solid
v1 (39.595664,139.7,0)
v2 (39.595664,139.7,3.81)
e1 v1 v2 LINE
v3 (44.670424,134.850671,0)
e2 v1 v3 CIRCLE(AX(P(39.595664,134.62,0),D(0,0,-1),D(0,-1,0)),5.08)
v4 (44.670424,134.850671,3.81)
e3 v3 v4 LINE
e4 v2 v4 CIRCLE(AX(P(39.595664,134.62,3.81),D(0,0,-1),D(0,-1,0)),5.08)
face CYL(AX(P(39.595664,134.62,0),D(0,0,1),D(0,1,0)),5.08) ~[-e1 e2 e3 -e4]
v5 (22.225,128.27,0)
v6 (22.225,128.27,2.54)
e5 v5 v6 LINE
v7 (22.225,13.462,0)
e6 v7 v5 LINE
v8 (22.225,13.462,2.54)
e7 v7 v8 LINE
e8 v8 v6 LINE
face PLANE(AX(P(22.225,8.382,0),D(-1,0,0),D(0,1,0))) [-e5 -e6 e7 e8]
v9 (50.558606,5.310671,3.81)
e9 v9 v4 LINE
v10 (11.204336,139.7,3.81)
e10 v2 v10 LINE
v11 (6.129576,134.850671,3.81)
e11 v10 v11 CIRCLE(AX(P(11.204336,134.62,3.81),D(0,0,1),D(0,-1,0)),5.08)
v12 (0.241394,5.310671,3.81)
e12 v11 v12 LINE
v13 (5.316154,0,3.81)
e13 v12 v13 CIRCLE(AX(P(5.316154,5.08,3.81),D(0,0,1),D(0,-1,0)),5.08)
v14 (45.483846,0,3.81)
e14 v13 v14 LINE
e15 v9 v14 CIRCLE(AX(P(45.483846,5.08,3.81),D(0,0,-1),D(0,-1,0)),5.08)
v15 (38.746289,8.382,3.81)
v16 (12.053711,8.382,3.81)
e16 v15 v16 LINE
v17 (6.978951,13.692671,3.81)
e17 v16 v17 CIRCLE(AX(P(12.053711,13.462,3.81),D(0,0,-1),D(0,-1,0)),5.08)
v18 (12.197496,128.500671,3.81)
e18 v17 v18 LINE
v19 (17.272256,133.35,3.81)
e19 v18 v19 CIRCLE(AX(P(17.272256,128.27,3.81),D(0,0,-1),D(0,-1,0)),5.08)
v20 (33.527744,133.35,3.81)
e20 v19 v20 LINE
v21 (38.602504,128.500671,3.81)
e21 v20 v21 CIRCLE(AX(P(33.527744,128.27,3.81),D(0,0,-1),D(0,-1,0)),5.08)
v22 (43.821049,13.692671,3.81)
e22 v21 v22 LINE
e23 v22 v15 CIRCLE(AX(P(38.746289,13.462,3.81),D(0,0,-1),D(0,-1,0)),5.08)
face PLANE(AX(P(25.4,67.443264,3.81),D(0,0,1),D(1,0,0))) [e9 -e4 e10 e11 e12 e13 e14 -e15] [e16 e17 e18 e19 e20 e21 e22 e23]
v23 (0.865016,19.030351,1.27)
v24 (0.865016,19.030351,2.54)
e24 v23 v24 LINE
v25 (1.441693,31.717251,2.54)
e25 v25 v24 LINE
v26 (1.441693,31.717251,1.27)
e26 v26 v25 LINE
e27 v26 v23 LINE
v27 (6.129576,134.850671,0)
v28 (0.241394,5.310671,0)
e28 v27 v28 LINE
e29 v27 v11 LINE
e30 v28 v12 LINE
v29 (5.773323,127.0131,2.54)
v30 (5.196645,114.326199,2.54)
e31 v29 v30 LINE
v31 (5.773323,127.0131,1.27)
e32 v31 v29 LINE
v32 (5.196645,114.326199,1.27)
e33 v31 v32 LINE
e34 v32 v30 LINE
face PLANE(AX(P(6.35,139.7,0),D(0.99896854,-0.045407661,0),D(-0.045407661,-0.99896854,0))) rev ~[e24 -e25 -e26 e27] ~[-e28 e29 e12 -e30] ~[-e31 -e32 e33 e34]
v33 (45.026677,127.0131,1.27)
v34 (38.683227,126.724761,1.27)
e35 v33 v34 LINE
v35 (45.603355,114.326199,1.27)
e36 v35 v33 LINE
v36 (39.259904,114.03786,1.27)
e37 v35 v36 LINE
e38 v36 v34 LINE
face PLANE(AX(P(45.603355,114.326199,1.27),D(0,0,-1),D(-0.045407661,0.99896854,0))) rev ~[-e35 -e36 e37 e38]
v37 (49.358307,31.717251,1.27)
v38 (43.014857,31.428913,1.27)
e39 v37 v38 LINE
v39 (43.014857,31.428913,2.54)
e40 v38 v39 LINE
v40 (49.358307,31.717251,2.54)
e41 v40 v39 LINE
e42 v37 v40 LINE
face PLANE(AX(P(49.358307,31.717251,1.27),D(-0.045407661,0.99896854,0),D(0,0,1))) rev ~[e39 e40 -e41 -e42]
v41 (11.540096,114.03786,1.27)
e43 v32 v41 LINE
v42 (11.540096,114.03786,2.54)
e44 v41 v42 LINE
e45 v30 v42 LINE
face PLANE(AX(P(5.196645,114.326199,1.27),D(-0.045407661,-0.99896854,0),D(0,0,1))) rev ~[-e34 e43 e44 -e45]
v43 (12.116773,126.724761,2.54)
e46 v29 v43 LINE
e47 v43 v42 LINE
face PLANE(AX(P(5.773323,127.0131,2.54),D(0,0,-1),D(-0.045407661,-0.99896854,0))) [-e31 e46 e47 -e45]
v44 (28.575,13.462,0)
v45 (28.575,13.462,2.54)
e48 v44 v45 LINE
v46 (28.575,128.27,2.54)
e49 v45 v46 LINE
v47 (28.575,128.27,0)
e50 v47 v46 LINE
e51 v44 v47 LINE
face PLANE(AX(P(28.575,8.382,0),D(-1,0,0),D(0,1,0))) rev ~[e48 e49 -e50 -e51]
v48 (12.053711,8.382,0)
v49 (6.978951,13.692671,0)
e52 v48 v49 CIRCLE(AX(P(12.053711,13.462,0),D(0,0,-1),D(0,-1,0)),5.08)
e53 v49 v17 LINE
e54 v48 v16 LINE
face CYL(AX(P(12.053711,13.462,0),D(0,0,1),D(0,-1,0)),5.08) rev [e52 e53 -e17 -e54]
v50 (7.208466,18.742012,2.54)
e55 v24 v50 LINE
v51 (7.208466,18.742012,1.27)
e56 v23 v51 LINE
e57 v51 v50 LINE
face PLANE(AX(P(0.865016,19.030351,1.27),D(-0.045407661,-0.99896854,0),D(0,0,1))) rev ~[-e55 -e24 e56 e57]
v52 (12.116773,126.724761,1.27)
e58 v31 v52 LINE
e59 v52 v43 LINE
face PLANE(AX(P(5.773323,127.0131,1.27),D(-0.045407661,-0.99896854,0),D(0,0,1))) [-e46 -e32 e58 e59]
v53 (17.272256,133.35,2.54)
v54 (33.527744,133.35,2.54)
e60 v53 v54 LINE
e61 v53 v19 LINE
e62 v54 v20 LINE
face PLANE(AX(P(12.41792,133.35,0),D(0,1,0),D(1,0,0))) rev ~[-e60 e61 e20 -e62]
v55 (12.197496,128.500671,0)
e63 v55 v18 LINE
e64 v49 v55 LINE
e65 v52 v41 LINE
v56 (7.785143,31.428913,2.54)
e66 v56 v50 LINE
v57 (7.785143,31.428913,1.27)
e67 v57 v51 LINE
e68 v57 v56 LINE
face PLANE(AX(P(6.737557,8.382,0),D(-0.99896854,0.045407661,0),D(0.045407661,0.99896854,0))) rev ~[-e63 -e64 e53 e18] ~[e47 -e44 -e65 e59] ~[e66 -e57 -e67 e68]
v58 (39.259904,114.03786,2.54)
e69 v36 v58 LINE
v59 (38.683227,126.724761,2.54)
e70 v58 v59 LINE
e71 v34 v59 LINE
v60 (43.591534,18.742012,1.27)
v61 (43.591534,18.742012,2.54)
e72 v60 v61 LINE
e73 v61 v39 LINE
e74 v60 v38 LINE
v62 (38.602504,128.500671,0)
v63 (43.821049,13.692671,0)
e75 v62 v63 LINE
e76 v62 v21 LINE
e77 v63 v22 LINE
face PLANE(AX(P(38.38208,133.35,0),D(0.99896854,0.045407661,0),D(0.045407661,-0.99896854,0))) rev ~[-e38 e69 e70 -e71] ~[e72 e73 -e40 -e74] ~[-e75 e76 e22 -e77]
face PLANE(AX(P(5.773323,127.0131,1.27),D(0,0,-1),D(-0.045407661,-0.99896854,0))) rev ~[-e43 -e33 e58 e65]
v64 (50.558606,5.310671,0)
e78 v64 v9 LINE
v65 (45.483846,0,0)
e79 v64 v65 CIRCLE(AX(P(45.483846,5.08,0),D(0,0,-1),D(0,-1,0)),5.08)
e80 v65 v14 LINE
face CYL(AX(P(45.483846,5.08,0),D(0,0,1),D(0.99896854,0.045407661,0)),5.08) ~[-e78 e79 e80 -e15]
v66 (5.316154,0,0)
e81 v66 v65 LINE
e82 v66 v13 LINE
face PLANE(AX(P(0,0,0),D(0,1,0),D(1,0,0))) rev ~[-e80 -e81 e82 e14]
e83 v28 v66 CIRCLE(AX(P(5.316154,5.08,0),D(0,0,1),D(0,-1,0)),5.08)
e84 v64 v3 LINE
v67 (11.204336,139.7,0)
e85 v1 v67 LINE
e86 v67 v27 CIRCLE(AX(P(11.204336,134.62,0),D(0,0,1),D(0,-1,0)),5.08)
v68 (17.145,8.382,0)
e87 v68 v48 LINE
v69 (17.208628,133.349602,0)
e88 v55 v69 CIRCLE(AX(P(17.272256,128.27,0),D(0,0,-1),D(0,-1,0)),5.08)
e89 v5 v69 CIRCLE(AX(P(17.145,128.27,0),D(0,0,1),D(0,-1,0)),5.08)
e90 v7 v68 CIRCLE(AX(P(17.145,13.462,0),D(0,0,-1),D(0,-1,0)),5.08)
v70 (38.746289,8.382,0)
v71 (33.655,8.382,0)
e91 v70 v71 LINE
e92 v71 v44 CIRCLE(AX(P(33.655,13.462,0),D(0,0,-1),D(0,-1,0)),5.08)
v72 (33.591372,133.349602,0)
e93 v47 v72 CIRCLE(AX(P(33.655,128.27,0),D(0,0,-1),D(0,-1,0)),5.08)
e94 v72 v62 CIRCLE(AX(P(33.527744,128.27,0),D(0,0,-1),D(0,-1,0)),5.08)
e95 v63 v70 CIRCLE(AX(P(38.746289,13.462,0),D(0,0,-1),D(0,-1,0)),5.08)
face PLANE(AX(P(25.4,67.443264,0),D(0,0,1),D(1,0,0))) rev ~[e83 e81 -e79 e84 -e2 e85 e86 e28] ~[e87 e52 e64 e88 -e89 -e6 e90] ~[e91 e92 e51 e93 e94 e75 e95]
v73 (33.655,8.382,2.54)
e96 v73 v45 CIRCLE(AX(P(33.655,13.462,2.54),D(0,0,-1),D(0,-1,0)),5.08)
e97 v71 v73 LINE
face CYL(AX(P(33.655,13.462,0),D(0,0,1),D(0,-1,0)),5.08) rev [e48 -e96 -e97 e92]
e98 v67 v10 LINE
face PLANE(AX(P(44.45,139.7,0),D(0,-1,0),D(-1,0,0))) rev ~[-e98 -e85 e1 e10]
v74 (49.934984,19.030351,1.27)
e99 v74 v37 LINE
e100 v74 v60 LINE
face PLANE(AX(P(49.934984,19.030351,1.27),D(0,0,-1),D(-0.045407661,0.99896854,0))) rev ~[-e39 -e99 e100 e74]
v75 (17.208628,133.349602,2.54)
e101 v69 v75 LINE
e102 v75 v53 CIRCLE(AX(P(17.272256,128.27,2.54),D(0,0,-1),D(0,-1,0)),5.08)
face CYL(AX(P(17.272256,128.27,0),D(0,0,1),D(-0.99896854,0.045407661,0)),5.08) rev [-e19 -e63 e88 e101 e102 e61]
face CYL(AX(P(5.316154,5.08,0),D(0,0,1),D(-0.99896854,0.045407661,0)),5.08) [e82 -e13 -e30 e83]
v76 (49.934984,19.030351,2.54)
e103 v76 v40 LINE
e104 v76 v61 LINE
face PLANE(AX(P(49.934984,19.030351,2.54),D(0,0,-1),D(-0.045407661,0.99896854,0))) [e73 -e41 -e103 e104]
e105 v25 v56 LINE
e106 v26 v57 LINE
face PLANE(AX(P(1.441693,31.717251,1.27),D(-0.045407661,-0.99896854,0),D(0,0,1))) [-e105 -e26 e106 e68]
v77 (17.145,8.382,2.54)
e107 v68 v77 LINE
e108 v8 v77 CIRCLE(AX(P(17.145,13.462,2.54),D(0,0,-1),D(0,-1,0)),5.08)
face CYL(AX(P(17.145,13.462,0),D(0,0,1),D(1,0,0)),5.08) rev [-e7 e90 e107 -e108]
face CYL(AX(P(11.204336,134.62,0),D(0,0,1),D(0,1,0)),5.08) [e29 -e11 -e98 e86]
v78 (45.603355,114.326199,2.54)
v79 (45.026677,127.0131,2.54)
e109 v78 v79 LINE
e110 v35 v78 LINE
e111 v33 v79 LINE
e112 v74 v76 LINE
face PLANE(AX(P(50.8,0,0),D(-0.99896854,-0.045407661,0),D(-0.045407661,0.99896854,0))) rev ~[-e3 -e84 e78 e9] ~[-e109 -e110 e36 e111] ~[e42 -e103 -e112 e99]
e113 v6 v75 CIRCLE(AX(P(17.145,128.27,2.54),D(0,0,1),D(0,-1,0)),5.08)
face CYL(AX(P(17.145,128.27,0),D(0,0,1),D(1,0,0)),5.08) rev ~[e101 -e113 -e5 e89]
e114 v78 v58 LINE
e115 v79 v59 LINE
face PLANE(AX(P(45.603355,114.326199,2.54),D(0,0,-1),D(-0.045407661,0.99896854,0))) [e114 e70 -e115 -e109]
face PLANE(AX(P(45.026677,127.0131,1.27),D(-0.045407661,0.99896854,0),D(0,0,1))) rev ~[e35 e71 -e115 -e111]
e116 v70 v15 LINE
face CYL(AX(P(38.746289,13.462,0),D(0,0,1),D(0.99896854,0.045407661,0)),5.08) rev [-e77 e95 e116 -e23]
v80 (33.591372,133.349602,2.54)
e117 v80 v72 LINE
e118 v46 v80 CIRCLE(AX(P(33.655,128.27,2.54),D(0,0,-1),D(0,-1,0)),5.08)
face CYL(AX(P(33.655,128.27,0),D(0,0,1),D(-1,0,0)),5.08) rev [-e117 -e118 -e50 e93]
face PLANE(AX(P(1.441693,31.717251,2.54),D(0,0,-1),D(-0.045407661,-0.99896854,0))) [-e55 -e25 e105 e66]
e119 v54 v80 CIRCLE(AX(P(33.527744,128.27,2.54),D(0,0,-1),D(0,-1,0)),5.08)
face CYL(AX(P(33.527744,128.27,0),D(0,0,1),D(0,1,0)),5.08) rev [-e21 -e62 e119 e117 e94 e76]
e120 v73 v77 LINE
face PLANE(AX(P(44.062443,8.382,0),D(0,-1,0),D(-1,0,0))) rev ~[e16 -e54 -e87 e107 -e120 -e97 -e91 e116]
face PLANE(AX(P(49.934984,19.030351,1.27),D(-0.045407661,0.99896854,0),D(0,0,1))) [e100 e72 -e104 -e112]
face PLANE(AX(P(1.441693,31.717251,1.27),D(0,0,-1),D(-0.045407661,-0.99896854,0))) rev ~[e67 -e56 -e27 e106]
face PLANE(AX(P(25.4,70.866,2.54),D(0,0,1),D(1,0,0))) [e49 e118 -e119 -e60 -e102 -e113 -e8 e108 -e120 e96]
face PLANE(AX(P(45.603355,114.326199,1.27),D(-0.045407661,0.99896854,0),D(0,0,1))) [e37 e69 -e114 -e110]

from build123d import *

# Parameters (mm, degrees)
F1_DEPTH = 3.81
F0_W     = 6.35
F0_H     = 124.968
F2_DEPTH = 2.54
F3_W     = 12.7
F3_H     = 1.27
F4_DEPTH = 6.35
F5_W     = 12.7
F5_H     = 1.27
F6_DEPTH = 6.35
F7_F1_R  = 5.08
F7_F2_R  = 5.08
F7_F3_R  = 5.08
F7_F4_R  = 5.08
F7_F5_R  = 5.08
F7_F6_R  = 5.08
F7_F7_R  = 5.08
F7_F8_R  = 5.08
F7_F9_R  = 5.08
F7_F10_R = 5.08
F7_F11_R = 5.08
F7_F12_R = 5.08


with BuildPart() as f1:
    # F0 (on Top) → F1 (new body)
    with BuildSketch(Plane.XY):
        Polygon((6.35, 139.7), (0, 0), (50.8, 0), (44.45, 139.7), align=None)
        Polygon((38.3820798312, 133.35), (44.0624434675, 8.382), (28.575, 8.382), (22.225, 8.382), (6.7375565325, 8.382), (12.4179201688, 133.35), (22.225, 133.35), (28.575, 133.35), align=None, mode=Mode.SUBTRACT)
    extrude(amount=F1_DEPTH)

    # F0 (on Top) → F2 (join)
    with BuildSketch(Plane.XY):
        with Locations((25.4, 70.866)):
            Rectangle(F0_W, F0_H)
    extrude(amount=F2_DEPTH)

    # F3 (on face) → F4 (cut)
    with BuildSketch(Plane(origin=(0, 0, 0), x_dir=(-0.0454076609, -0.9989685402, 0), z_dir=(-0.9989685402, 0.0454076609, 0))):
        with Locations((-120.7942437142, 1.905)):
            Rectangle(F3_W, F3_H)
        with Locations((-25.4, 1.905)):
            Rectangle(F3_W, F3_H)
    extrude(amount=-F4_DEPTH, mode=Mode.SUBTRACT)

    # F5 (on face) → F6 (cut)
    with BuildSketch(Plane(origin=(50.695257732, 2.3043298969, 0), x_dir=(-0.0454076609, 0.9989685402, 0), z_dir=(0.9989685402, 0.0454076609, 0))):
        with Locations((23.0932908253, 1.905)):
            Rectangle(F5_W, F5_H)
        with Locations((118.4875345395, 1.905)):
            Rectangle(F5_W, F5_H)
    extrude(amount=-F6_DEPTH, mode=Mode.SUBTRACT)

    # F7: fillet of radius 5.08 on 12 edges, made by hand

    # F7_f1
    f7_f1_edges = [f1.edges().sort_by_distance(p)[0] for p in [
        (28.575, 8.382, 1.27),
    ]]
    fillet(f7_f1_edges, radius=F7_F1_R)

    # F7_f2
    f7_f2_edges = [f1.edges().sort_by_distance(p)[0] for p in [
        (22.225, 8.382, 1.27),
    ]]
    fillet(f7_f2_edges, radius=F7_F2_R)

    # F7_f3
    f7_f3_edges = [f1.edges().sort_by_distance(p)[0] for p in [
        (28.575, 133.35, 1.27),
    ]]
    fillet(f7_f3_edges, radius=F7_F3_R)

    # F7_f4
    f7_f4_edges = [f1.edges().sort_by_distance(p)[0] for p in [
        (22.225, 133.35, 1.27),
    ]]
    fillet(f7_f4_edges, radius=F7_F4_R)

    # F7_f5
    f7_f5_edges = [f1.edges().sort_by_distance(p)[0] for p in [
        (6.35, 139.7, 1.905),
    ]]
    fillet(f7_f5_edges, radius=F7_F5_R)

    # F7_f6
    f7_f6_edges = [f1.edges().sort_by_distance(p)[0] for p in [
        (0, 0, 1.905),
    ]]
    fillet(f7_f6_edges, radius=F7_F6_R)

    # F7_f7
    f7_f7_edges = [f1.edges().sort_by_distance(p)[0] for p in [
        (44.45, 139.7, 1.905),
    ]]
    fillet(f7_f7_edges, radius=F7_F7_R)

    # F7_f8
    f7_f8_edges = [f1.edges().sort_by_distance(p)[0] for p in [
        (50.8, 0, 1.905),
    ]]
    fillet(f7_f8_edges, radius=F7_F8_R)

    # F7_f9
    f7_f9_edges = [f1.edges().sort_by_distance(p)[0] for p in [
        (38.3820798312, 133.35, 1.905),
    ]]
    fillet(f7_f9_edges, radius=F7_F9_R)

    # F7_f10
    f7_f10_edges = [f1.edges().sort_by_distance(p)[0] for p in [
        (44.0624434675, 8.382, 1.905),
    ]]
    fillet(f7_f10_edges, radius=F7_F10_R)

    # F7_f11
    f7_f11_edges = [f1.edges().sort_by_distance(p)[0] for p in [
        (6.7375565325, 8.382, 1.905),
    ]]
    fillet(f7_f11_edges, radius=F7_F11_R)

    # F7_f12
    f7_f12_edges = [f1.edges().sort_by_distance(p)[0] for p in [
        (12.4179201688, 133.35, 1.905),
    ]]
    fillet(f7_f12_edges, radius=F7_F12_R)


solid = f1.part
